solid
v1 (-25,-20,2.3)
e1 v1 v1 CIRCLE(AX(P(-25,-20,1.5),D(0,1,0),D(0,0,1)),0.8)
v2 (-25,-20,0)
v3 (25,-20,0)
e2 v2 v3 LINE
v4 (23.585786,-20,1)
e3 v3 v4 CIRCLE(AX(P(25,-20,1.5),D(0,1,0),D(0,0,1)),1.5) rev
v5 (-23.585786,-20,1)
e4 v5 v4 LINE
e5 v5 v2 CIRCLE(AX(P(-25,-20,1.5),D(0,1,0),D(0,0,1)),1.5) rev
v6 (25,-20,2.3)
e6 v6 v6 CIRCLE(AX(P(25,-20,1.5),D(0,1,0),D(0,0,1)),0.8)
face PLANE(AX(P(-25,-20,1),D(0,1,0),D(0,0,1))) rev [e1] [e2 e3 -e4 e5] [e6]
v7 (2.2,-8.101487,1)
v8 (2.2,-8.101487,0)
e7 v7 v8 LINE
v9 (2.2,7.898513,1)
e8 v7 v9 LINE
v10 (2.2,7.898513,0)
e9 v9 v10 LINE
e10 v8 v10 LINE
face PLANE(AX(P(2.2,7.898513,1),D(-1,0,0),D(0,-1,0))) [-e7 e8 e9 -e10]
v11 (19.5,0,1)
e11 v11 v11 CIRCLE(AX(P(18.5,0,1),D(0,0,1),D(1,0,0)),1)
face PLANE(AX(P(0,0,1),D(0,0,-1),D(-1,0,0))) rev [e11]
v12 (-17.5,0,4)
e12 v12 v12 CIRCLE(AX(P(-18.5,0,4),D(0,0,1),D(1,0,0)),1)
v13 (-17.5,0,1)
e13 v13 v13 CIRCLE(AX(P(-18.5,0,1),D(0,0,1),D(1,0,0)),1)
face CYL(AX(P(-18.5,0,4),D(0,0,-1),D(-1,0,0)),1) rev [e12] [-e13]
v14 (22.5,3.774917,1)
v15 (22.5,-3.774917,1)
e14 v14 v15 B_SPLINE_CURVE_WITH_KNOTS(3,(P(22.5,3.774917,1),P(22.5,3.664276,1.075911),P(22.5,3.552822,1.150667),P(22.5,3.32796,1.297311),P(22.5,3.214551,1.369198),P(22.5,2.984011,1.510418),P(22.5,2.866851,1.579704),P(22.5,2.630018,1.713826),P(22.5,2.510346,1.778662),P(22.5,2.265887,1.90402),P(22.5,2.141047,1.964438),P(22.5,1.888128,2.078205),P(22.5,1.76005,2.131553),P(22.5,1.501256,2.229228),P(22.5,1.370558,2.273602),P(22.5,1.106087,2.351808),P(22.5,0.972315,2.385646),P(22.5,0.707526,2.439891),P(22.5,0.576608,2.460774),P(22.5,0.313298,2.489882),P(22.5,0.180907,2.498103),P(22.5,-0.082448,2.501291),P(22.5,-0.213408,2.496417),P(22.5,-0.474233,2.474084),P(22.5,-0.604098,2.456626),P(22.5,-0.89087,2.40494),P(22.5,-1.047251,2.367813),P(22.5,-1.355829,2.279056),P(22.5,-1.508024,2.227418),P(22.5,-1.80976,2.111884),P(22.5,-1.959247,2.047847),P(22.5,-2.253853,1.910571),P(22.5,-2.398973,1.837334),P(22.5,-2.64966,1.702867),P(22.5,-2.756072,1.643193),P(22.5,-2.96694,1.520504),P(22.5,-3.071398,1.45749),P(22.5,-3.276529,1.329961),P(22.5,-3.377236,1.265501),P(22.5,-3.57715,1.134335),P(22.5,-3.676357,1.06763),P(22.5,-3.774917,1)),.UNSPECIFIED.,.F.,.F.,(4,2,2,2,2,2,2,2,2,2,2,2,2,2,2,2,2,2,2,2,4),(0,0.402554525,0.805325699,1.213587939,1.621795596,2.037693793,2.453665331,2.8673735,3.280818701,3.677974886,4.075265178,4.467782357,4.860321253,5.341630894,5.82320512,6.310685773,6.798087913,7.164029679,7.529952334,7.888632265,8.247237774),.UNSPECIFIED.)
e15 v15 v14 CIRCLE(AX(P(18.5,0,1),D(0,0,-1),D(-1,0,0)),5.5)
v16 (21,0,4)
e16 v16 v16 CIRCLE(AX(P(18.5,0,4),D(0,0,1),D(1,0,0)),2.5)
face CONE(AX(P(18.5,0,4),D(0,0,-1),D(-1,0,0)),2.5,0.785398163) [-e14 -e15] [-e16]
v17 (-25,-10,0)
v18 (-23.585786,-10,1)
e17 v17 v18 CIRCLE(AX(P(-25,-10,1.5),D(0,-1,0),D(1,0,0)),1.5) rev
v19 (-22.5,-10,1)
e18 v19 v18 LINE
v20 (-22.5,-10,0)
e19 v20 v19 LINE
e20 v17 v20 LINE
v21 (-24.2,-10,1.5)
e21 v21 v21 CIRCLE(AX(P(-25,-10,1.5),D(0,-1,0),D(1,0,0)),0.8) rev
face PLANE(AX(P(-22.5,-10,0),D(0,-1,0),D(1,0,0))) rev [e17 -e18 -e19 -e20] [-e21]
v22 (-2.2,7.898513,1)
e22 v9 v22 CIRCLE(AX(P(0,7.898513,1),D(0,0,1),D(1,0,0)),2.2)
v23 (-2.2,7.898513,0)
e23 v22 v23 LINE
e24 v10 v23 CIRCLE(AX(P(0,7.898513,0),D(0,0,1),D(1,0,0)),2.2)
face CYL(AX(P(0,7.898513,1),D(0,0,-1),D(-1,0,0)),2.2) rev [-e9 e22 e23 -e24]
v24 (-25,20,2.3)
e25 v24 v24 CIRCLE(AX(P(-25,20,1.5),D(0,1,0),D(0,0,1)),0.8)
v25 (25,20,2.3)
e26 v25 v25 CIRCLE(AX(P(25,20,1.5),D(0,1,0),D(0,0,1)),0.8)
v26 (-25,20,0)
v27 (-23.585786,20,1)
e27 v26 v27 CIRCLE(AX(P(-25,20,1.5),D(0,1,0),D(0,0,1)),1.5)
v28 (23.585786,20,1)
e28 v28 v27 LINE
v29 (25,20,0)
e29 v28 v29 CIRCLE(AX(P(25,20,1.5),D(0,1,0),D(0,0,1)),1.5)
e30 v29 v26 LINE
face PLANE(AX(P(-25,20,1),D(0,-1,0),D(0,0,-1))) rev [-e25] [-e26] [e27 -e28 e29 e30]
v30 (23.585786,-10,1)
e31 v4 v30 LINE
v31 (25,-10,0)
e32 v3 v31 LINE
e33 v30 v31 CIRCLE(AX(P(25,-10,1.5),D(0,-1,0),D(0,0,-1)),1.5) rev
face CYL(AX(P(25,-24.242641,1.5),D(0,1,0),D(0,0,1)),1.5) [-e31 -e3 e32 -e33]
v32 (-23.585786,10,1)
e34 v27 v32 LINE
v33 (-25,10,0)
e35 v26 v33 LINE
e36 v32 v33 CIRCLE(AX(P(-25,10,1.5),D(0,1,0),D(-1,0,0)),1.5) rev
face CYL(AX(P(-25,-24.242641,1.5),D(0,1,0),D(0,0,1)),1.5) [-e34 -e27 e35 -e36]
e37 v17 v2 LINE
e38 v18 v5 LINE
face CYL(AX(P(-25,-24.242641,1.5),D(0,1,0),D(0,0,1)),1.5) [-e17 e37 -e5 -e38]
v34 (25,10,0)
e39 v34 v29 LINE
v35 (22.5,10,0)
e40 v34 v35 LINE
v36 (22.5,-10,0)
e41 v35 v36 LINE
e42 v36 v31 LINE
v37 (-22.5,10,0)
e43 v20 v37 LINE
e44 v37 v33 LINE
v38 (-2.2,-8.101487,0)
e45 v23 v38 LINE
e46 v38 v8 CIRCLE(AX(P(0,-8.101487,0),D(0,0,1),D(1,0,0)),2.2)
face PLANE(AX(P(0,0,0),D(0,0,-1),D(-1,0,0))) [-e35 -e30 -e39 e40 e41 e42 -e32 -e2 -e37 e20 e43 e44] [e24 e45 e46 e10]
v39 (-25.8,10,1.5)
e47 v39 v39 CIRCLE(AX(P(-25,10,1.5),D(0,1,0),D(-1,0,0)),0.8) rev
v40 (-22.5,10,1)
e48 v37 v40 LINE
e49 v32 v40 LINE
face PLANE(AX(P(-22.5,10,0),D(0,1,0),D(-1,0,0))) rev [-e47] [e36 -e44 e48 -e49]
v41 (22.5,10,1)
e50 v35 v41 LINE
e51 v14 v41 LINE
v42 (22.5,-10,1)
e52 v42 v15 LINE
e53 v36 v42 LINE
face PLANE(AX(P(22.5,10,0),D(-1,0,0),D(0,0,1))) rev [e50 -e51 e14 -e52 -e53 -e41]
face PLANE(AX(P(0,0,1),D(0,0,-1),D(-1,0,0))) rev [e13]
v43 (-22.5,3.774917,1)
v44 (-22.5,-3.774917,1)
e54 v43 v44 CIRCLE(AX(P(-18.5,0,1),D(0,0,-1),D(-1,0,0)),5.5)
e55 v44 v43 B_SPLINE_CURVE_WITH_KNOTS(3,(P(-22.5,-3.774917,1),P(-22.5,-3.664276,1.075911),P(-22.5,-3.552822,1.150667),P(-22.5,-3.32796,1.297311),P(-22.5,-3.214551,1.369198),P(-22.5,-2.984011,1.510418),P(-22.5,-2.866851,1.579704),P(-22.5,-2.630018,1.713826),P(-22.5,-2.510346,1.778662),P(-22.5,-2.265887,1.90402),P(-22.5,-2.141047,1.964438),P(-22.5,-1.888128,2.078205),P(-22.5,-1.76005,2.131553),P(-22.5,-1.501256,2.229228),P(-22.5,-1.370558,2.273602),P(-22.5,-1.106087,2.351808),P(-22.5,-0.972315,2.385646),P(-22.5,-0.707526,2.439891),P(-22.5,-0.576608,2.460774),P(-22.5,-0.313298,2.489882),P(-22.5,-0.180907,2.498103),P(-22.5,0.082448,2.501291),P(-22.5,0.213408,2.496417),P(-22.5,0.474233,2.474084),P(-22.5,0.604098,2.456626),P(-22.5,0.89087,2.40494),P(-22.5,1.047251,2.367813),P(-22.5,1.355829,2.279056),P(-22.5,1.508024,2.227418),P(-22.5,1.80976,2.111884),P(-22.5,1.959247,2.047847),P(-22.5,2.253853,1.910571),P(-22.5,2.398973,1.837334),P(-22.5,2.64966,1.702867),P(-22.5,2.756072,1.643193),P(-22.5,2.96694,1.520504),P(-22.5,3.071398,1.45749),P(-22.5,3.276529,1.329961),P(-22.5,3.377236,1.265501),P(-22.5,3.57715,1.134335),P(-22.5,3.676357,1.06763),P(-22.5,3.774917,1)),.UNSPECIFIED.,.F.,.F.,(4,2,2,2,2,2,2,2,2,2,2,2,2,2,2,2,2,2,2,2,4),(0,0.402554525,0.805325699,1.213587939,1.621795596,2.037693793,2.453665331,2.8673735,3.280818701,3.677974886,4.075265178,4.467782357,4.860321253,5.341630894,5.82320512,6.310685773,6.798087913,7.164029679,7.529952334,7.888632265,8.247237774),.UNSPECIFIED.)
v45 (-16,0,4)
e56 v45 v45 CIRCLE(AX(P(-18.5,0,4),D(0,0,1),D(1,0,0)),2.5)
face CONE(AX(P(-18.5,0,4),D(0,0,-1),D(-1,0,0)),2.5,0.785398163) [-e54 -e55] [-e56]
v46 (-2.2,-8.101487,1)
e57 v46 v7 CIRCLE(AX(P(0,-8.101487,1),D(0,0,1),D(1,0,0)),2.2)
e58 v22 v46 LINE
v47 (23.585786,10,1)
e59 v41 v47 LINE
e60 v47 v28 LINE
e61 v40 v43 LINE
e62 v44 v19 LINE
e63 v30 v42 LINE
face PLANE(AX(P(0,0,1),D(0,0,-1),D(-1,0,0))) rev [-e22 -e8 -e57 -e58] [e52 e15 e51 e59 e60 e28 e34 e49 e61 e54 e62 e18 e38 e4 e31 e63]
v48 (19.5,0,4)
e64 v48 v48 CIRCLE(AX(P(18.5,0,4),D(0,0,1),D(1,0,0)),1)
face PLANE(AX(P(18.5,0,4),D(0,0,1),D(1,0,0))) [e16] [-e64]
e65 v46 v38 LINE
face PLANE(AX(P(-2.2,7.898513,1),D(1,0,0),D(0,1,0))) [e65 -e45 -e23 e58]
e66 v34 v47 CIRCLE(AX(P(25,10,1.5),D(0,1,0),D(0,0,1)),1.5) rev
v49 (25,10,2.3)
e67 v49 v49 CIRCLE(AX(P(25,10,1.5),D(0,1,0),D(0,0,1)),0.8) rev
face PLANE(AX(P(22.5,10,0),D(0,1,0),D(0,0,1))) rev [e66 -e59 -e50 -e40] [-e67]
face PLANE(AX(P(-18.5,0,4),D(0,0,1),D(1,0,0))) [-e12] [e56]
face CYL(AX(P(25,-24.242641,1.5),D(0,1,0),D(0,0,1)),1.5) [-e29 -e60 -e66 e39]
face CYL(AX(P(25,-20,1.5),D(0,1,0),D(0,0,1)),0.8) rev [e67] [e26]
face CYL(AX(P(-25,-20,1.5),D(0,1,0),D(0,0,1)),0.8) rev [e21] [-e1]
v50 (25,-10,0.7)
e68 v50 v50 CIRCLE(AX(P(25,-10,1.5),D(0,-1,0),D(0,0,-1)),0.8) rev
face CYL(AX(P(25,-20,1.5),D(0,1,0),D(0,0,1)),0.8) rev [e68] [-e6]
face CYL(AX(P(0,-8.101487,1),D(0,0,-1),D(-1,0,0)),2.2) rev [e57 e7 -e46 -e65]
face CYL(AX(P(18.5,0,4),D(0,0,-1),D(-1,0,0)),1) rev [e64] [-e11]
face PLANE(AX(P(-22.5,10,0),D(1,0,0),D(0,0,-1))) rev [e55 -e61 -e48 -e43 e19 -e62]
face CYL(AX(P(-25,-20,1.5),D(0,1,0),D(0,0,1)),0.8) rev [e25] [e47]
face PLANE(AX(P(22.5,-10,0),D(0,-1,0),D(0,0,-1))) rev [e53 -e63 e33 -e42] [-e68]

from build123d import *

# Parameters (mm, degrees)
SKETCH1_W               = 50
SKETCH1_H               = 40
BOSS_EXTRUDE1_DEPTH     = 1
SKETCH2_R               = 1.5
BOSS_EXTRUDE2_DEPTH     = 40
SKETCH3_R               = 0.8
CUT_EXTRUDE1_DEPTH      = 49.075461516
CUT_EXTRUDE2_DEPTH      = 34.260336739
CUT_EXTRUDE2_DEPTH_BACK = 34.260336739
SKETCH4_W               = 29.985936658
SKETCH4_H               = 20
SKETCH4_W_2             = 10.666279811
SKETCH5_R               = 2.5
SKETCH5_R_2             = 1
BOSS_EXTRUDE3_DEPTH     = 3
CHAMFER1_SIZE           = 3


with BuildPart() as part:
    # Sketch1 → Boss-Extrude1 (new body)
    with BuildSketch(Plane.XY):
        Rectangle(SKETCH1_W, SKETCH1_H)
        with BuildLine():
            Line((2.2, 7.898513293), (2.2, -8.101486707))
            ThreePointArc((2.2, -8.101486707), (0, -10.301486707), (-2.2, -8.101486707))
            Line((-2.2, -8.101486707), (-2.2, 7.898513293))
            ThreePointArc((-2.2, 7.898513293), (0, 10.098513293), (2.2, 7.898513293))
        make_face(mode=Mode.SUBTRACT)
    extrude(amount=BOSS_EXTRUDE1_DEPTH)

    # Sketch2 → Boss-Extrude2 (add)
    with BuildSketch(Plane(origin=(0, 20, 0), x_dir=(1, 0, 0), z_dir=(0, 1, 0))):
        with Locations((-25, -1.5)):
            Circle(SKETCH2_R)
        with Locations((25, -1.5)):
            Circle(SKETCH2_R)
    extrude(amount=-BOSS_EXTRUDE2_DEPTH)

    # Sketch3 → Cut-Extrude1 (cut, through all)
    with BuildSketch(Plane(origin=(0, 20, 0), x_dir=(1, 0, 0), z_dir=(0, 1, 0))):
        with Locations(Location((-25, -1.5, 0), (0, 0, 270))):
            Circle(SKETCH3_R)
        with Locations(Location((25, -1.5, 0), (0, 0, 270))):
            Circle(SKETCH3_R)
    extrude(amount=-CUT_EXTRUDE1_DEPTH, mode=Mode.SUBTRACT)

    # Sketch4 → Cut-Extrude2 (cut, two sides: drawn at the far end of the back side and taken through both)
    with BuildSketch(Plane.XY.offset(1).offset(-CUT_EXTRUDE2_DEPTH_BACK)):
        with Locations((-37.492968329, 0)):
            Rectangle(SKETCH4_W, SKETCH4_H)
        with Locations((27.833139906, 0)):
            Rectangle(SKETCH4_W_2, SKETCH4_H)
    extrude(amount=CUT_EXTRUDE2_DEPTH + CUT_EXTRUDE2_DEPTH_BACK, mode=Mode.SUBTRACT)

    # Sketch5 → Boss-Extrude3 (add)
    # profile 1 of 2: a face of its own
    with BuildSketch(Plane.XY.offset(1)):
        with Locations(Location((-18.5, 0, 0), (0, 0, 180))):
            Circle(SKETCH5_R)
        with Locations((-18.5, 0)):
            Circle(SKETCH5_R_2, mode=Mode.SUBTRACT)
    # profile 2 of 2: a face of its own
    with BuildSketch(Plane.XY.offset(1)):
        with Locations(Location((18.5, 0, 0), (0, 0, 180))):
            Circle(SKETCH5_R)
        with Locations((18.5, 0)):
            Circle(SKETCH5_R_2, mode=Mode.SUBTRACT)
    extrude(amount=BOSS_EXTRUDE3_DEPTH)

    # Chamfer1
    # the kernel refuses this chamfer: 3 mm, written as the material it adds along each edge
    with BuildSketch(Plane(origin=(-18.5, 0, 1), x_dir=(-1, 0, 0), z_dir=(0, 1, 0))) as chamfer1_piece_1_section:
        Polygon((2.5 + CHAMFER1_SIZE, 0), (2.5, CHAMFER1_SIZE), (2.5, 0), align=None)
    chamfer1_piece_1 = revolve(axis=Axis((-18.5, 0, 1), (0, 0, 1)), mode=Mode.PRIVATE)
    chamfer1_piece_1 = split(chamfer1_piece_1, bisect_by=Plane(origin=(-22.5, 0, 2.424420983), z_dir=(1, 0, 0)), keep=Keep.TOP, mode=Mode.PRIVATE)
    chamfer1_piece_1 = split(chamfer1_piece_1, bisect_by=Plane(origin=(-14.490726203, 0, 4), z_dir=(0, 0, -1)), keep=Keep.TOP, mode=Mode.PRIVATE)
    add(chamfer1_piece_1)
    with BuildSketch(Plane(origin=(18.5, 0, 1), x_dir=(-1, 0, 0), z_dir=(0, 1, 0))) as chamfer1_piece_2_section:
        Polygon((2.5 + CHAMFER1_SIZE, 0), (2.5, CHAMFER1_SIZE), (2.5, 0), align=None)
    chamfer1_piece_2 = revolve(axis=Axis((18.5, 0, 1), (0, 0, 1)), mode=Mode.PRIVATE)
    chamfer1_piece_2 = split(chamfer1_piece_2, bisect_by=Plane(origin=(22.5, -4.362653262, 1.396136714), z_dir=(-1, 0, 0)), keep=Keep.TOP, mode=Mode.PRIVATE)
    chamfer1_piece_2 = split(chamfer1_piece_2, bisect_by=Plane(origin=(15.981220965, -4.362653262, 4), z_dir=(0, 0, -1)), keep=Keep.TOP, mode=Mode.PRIVATE)
    add(chamfer1_piece_2)


solid = part.part
